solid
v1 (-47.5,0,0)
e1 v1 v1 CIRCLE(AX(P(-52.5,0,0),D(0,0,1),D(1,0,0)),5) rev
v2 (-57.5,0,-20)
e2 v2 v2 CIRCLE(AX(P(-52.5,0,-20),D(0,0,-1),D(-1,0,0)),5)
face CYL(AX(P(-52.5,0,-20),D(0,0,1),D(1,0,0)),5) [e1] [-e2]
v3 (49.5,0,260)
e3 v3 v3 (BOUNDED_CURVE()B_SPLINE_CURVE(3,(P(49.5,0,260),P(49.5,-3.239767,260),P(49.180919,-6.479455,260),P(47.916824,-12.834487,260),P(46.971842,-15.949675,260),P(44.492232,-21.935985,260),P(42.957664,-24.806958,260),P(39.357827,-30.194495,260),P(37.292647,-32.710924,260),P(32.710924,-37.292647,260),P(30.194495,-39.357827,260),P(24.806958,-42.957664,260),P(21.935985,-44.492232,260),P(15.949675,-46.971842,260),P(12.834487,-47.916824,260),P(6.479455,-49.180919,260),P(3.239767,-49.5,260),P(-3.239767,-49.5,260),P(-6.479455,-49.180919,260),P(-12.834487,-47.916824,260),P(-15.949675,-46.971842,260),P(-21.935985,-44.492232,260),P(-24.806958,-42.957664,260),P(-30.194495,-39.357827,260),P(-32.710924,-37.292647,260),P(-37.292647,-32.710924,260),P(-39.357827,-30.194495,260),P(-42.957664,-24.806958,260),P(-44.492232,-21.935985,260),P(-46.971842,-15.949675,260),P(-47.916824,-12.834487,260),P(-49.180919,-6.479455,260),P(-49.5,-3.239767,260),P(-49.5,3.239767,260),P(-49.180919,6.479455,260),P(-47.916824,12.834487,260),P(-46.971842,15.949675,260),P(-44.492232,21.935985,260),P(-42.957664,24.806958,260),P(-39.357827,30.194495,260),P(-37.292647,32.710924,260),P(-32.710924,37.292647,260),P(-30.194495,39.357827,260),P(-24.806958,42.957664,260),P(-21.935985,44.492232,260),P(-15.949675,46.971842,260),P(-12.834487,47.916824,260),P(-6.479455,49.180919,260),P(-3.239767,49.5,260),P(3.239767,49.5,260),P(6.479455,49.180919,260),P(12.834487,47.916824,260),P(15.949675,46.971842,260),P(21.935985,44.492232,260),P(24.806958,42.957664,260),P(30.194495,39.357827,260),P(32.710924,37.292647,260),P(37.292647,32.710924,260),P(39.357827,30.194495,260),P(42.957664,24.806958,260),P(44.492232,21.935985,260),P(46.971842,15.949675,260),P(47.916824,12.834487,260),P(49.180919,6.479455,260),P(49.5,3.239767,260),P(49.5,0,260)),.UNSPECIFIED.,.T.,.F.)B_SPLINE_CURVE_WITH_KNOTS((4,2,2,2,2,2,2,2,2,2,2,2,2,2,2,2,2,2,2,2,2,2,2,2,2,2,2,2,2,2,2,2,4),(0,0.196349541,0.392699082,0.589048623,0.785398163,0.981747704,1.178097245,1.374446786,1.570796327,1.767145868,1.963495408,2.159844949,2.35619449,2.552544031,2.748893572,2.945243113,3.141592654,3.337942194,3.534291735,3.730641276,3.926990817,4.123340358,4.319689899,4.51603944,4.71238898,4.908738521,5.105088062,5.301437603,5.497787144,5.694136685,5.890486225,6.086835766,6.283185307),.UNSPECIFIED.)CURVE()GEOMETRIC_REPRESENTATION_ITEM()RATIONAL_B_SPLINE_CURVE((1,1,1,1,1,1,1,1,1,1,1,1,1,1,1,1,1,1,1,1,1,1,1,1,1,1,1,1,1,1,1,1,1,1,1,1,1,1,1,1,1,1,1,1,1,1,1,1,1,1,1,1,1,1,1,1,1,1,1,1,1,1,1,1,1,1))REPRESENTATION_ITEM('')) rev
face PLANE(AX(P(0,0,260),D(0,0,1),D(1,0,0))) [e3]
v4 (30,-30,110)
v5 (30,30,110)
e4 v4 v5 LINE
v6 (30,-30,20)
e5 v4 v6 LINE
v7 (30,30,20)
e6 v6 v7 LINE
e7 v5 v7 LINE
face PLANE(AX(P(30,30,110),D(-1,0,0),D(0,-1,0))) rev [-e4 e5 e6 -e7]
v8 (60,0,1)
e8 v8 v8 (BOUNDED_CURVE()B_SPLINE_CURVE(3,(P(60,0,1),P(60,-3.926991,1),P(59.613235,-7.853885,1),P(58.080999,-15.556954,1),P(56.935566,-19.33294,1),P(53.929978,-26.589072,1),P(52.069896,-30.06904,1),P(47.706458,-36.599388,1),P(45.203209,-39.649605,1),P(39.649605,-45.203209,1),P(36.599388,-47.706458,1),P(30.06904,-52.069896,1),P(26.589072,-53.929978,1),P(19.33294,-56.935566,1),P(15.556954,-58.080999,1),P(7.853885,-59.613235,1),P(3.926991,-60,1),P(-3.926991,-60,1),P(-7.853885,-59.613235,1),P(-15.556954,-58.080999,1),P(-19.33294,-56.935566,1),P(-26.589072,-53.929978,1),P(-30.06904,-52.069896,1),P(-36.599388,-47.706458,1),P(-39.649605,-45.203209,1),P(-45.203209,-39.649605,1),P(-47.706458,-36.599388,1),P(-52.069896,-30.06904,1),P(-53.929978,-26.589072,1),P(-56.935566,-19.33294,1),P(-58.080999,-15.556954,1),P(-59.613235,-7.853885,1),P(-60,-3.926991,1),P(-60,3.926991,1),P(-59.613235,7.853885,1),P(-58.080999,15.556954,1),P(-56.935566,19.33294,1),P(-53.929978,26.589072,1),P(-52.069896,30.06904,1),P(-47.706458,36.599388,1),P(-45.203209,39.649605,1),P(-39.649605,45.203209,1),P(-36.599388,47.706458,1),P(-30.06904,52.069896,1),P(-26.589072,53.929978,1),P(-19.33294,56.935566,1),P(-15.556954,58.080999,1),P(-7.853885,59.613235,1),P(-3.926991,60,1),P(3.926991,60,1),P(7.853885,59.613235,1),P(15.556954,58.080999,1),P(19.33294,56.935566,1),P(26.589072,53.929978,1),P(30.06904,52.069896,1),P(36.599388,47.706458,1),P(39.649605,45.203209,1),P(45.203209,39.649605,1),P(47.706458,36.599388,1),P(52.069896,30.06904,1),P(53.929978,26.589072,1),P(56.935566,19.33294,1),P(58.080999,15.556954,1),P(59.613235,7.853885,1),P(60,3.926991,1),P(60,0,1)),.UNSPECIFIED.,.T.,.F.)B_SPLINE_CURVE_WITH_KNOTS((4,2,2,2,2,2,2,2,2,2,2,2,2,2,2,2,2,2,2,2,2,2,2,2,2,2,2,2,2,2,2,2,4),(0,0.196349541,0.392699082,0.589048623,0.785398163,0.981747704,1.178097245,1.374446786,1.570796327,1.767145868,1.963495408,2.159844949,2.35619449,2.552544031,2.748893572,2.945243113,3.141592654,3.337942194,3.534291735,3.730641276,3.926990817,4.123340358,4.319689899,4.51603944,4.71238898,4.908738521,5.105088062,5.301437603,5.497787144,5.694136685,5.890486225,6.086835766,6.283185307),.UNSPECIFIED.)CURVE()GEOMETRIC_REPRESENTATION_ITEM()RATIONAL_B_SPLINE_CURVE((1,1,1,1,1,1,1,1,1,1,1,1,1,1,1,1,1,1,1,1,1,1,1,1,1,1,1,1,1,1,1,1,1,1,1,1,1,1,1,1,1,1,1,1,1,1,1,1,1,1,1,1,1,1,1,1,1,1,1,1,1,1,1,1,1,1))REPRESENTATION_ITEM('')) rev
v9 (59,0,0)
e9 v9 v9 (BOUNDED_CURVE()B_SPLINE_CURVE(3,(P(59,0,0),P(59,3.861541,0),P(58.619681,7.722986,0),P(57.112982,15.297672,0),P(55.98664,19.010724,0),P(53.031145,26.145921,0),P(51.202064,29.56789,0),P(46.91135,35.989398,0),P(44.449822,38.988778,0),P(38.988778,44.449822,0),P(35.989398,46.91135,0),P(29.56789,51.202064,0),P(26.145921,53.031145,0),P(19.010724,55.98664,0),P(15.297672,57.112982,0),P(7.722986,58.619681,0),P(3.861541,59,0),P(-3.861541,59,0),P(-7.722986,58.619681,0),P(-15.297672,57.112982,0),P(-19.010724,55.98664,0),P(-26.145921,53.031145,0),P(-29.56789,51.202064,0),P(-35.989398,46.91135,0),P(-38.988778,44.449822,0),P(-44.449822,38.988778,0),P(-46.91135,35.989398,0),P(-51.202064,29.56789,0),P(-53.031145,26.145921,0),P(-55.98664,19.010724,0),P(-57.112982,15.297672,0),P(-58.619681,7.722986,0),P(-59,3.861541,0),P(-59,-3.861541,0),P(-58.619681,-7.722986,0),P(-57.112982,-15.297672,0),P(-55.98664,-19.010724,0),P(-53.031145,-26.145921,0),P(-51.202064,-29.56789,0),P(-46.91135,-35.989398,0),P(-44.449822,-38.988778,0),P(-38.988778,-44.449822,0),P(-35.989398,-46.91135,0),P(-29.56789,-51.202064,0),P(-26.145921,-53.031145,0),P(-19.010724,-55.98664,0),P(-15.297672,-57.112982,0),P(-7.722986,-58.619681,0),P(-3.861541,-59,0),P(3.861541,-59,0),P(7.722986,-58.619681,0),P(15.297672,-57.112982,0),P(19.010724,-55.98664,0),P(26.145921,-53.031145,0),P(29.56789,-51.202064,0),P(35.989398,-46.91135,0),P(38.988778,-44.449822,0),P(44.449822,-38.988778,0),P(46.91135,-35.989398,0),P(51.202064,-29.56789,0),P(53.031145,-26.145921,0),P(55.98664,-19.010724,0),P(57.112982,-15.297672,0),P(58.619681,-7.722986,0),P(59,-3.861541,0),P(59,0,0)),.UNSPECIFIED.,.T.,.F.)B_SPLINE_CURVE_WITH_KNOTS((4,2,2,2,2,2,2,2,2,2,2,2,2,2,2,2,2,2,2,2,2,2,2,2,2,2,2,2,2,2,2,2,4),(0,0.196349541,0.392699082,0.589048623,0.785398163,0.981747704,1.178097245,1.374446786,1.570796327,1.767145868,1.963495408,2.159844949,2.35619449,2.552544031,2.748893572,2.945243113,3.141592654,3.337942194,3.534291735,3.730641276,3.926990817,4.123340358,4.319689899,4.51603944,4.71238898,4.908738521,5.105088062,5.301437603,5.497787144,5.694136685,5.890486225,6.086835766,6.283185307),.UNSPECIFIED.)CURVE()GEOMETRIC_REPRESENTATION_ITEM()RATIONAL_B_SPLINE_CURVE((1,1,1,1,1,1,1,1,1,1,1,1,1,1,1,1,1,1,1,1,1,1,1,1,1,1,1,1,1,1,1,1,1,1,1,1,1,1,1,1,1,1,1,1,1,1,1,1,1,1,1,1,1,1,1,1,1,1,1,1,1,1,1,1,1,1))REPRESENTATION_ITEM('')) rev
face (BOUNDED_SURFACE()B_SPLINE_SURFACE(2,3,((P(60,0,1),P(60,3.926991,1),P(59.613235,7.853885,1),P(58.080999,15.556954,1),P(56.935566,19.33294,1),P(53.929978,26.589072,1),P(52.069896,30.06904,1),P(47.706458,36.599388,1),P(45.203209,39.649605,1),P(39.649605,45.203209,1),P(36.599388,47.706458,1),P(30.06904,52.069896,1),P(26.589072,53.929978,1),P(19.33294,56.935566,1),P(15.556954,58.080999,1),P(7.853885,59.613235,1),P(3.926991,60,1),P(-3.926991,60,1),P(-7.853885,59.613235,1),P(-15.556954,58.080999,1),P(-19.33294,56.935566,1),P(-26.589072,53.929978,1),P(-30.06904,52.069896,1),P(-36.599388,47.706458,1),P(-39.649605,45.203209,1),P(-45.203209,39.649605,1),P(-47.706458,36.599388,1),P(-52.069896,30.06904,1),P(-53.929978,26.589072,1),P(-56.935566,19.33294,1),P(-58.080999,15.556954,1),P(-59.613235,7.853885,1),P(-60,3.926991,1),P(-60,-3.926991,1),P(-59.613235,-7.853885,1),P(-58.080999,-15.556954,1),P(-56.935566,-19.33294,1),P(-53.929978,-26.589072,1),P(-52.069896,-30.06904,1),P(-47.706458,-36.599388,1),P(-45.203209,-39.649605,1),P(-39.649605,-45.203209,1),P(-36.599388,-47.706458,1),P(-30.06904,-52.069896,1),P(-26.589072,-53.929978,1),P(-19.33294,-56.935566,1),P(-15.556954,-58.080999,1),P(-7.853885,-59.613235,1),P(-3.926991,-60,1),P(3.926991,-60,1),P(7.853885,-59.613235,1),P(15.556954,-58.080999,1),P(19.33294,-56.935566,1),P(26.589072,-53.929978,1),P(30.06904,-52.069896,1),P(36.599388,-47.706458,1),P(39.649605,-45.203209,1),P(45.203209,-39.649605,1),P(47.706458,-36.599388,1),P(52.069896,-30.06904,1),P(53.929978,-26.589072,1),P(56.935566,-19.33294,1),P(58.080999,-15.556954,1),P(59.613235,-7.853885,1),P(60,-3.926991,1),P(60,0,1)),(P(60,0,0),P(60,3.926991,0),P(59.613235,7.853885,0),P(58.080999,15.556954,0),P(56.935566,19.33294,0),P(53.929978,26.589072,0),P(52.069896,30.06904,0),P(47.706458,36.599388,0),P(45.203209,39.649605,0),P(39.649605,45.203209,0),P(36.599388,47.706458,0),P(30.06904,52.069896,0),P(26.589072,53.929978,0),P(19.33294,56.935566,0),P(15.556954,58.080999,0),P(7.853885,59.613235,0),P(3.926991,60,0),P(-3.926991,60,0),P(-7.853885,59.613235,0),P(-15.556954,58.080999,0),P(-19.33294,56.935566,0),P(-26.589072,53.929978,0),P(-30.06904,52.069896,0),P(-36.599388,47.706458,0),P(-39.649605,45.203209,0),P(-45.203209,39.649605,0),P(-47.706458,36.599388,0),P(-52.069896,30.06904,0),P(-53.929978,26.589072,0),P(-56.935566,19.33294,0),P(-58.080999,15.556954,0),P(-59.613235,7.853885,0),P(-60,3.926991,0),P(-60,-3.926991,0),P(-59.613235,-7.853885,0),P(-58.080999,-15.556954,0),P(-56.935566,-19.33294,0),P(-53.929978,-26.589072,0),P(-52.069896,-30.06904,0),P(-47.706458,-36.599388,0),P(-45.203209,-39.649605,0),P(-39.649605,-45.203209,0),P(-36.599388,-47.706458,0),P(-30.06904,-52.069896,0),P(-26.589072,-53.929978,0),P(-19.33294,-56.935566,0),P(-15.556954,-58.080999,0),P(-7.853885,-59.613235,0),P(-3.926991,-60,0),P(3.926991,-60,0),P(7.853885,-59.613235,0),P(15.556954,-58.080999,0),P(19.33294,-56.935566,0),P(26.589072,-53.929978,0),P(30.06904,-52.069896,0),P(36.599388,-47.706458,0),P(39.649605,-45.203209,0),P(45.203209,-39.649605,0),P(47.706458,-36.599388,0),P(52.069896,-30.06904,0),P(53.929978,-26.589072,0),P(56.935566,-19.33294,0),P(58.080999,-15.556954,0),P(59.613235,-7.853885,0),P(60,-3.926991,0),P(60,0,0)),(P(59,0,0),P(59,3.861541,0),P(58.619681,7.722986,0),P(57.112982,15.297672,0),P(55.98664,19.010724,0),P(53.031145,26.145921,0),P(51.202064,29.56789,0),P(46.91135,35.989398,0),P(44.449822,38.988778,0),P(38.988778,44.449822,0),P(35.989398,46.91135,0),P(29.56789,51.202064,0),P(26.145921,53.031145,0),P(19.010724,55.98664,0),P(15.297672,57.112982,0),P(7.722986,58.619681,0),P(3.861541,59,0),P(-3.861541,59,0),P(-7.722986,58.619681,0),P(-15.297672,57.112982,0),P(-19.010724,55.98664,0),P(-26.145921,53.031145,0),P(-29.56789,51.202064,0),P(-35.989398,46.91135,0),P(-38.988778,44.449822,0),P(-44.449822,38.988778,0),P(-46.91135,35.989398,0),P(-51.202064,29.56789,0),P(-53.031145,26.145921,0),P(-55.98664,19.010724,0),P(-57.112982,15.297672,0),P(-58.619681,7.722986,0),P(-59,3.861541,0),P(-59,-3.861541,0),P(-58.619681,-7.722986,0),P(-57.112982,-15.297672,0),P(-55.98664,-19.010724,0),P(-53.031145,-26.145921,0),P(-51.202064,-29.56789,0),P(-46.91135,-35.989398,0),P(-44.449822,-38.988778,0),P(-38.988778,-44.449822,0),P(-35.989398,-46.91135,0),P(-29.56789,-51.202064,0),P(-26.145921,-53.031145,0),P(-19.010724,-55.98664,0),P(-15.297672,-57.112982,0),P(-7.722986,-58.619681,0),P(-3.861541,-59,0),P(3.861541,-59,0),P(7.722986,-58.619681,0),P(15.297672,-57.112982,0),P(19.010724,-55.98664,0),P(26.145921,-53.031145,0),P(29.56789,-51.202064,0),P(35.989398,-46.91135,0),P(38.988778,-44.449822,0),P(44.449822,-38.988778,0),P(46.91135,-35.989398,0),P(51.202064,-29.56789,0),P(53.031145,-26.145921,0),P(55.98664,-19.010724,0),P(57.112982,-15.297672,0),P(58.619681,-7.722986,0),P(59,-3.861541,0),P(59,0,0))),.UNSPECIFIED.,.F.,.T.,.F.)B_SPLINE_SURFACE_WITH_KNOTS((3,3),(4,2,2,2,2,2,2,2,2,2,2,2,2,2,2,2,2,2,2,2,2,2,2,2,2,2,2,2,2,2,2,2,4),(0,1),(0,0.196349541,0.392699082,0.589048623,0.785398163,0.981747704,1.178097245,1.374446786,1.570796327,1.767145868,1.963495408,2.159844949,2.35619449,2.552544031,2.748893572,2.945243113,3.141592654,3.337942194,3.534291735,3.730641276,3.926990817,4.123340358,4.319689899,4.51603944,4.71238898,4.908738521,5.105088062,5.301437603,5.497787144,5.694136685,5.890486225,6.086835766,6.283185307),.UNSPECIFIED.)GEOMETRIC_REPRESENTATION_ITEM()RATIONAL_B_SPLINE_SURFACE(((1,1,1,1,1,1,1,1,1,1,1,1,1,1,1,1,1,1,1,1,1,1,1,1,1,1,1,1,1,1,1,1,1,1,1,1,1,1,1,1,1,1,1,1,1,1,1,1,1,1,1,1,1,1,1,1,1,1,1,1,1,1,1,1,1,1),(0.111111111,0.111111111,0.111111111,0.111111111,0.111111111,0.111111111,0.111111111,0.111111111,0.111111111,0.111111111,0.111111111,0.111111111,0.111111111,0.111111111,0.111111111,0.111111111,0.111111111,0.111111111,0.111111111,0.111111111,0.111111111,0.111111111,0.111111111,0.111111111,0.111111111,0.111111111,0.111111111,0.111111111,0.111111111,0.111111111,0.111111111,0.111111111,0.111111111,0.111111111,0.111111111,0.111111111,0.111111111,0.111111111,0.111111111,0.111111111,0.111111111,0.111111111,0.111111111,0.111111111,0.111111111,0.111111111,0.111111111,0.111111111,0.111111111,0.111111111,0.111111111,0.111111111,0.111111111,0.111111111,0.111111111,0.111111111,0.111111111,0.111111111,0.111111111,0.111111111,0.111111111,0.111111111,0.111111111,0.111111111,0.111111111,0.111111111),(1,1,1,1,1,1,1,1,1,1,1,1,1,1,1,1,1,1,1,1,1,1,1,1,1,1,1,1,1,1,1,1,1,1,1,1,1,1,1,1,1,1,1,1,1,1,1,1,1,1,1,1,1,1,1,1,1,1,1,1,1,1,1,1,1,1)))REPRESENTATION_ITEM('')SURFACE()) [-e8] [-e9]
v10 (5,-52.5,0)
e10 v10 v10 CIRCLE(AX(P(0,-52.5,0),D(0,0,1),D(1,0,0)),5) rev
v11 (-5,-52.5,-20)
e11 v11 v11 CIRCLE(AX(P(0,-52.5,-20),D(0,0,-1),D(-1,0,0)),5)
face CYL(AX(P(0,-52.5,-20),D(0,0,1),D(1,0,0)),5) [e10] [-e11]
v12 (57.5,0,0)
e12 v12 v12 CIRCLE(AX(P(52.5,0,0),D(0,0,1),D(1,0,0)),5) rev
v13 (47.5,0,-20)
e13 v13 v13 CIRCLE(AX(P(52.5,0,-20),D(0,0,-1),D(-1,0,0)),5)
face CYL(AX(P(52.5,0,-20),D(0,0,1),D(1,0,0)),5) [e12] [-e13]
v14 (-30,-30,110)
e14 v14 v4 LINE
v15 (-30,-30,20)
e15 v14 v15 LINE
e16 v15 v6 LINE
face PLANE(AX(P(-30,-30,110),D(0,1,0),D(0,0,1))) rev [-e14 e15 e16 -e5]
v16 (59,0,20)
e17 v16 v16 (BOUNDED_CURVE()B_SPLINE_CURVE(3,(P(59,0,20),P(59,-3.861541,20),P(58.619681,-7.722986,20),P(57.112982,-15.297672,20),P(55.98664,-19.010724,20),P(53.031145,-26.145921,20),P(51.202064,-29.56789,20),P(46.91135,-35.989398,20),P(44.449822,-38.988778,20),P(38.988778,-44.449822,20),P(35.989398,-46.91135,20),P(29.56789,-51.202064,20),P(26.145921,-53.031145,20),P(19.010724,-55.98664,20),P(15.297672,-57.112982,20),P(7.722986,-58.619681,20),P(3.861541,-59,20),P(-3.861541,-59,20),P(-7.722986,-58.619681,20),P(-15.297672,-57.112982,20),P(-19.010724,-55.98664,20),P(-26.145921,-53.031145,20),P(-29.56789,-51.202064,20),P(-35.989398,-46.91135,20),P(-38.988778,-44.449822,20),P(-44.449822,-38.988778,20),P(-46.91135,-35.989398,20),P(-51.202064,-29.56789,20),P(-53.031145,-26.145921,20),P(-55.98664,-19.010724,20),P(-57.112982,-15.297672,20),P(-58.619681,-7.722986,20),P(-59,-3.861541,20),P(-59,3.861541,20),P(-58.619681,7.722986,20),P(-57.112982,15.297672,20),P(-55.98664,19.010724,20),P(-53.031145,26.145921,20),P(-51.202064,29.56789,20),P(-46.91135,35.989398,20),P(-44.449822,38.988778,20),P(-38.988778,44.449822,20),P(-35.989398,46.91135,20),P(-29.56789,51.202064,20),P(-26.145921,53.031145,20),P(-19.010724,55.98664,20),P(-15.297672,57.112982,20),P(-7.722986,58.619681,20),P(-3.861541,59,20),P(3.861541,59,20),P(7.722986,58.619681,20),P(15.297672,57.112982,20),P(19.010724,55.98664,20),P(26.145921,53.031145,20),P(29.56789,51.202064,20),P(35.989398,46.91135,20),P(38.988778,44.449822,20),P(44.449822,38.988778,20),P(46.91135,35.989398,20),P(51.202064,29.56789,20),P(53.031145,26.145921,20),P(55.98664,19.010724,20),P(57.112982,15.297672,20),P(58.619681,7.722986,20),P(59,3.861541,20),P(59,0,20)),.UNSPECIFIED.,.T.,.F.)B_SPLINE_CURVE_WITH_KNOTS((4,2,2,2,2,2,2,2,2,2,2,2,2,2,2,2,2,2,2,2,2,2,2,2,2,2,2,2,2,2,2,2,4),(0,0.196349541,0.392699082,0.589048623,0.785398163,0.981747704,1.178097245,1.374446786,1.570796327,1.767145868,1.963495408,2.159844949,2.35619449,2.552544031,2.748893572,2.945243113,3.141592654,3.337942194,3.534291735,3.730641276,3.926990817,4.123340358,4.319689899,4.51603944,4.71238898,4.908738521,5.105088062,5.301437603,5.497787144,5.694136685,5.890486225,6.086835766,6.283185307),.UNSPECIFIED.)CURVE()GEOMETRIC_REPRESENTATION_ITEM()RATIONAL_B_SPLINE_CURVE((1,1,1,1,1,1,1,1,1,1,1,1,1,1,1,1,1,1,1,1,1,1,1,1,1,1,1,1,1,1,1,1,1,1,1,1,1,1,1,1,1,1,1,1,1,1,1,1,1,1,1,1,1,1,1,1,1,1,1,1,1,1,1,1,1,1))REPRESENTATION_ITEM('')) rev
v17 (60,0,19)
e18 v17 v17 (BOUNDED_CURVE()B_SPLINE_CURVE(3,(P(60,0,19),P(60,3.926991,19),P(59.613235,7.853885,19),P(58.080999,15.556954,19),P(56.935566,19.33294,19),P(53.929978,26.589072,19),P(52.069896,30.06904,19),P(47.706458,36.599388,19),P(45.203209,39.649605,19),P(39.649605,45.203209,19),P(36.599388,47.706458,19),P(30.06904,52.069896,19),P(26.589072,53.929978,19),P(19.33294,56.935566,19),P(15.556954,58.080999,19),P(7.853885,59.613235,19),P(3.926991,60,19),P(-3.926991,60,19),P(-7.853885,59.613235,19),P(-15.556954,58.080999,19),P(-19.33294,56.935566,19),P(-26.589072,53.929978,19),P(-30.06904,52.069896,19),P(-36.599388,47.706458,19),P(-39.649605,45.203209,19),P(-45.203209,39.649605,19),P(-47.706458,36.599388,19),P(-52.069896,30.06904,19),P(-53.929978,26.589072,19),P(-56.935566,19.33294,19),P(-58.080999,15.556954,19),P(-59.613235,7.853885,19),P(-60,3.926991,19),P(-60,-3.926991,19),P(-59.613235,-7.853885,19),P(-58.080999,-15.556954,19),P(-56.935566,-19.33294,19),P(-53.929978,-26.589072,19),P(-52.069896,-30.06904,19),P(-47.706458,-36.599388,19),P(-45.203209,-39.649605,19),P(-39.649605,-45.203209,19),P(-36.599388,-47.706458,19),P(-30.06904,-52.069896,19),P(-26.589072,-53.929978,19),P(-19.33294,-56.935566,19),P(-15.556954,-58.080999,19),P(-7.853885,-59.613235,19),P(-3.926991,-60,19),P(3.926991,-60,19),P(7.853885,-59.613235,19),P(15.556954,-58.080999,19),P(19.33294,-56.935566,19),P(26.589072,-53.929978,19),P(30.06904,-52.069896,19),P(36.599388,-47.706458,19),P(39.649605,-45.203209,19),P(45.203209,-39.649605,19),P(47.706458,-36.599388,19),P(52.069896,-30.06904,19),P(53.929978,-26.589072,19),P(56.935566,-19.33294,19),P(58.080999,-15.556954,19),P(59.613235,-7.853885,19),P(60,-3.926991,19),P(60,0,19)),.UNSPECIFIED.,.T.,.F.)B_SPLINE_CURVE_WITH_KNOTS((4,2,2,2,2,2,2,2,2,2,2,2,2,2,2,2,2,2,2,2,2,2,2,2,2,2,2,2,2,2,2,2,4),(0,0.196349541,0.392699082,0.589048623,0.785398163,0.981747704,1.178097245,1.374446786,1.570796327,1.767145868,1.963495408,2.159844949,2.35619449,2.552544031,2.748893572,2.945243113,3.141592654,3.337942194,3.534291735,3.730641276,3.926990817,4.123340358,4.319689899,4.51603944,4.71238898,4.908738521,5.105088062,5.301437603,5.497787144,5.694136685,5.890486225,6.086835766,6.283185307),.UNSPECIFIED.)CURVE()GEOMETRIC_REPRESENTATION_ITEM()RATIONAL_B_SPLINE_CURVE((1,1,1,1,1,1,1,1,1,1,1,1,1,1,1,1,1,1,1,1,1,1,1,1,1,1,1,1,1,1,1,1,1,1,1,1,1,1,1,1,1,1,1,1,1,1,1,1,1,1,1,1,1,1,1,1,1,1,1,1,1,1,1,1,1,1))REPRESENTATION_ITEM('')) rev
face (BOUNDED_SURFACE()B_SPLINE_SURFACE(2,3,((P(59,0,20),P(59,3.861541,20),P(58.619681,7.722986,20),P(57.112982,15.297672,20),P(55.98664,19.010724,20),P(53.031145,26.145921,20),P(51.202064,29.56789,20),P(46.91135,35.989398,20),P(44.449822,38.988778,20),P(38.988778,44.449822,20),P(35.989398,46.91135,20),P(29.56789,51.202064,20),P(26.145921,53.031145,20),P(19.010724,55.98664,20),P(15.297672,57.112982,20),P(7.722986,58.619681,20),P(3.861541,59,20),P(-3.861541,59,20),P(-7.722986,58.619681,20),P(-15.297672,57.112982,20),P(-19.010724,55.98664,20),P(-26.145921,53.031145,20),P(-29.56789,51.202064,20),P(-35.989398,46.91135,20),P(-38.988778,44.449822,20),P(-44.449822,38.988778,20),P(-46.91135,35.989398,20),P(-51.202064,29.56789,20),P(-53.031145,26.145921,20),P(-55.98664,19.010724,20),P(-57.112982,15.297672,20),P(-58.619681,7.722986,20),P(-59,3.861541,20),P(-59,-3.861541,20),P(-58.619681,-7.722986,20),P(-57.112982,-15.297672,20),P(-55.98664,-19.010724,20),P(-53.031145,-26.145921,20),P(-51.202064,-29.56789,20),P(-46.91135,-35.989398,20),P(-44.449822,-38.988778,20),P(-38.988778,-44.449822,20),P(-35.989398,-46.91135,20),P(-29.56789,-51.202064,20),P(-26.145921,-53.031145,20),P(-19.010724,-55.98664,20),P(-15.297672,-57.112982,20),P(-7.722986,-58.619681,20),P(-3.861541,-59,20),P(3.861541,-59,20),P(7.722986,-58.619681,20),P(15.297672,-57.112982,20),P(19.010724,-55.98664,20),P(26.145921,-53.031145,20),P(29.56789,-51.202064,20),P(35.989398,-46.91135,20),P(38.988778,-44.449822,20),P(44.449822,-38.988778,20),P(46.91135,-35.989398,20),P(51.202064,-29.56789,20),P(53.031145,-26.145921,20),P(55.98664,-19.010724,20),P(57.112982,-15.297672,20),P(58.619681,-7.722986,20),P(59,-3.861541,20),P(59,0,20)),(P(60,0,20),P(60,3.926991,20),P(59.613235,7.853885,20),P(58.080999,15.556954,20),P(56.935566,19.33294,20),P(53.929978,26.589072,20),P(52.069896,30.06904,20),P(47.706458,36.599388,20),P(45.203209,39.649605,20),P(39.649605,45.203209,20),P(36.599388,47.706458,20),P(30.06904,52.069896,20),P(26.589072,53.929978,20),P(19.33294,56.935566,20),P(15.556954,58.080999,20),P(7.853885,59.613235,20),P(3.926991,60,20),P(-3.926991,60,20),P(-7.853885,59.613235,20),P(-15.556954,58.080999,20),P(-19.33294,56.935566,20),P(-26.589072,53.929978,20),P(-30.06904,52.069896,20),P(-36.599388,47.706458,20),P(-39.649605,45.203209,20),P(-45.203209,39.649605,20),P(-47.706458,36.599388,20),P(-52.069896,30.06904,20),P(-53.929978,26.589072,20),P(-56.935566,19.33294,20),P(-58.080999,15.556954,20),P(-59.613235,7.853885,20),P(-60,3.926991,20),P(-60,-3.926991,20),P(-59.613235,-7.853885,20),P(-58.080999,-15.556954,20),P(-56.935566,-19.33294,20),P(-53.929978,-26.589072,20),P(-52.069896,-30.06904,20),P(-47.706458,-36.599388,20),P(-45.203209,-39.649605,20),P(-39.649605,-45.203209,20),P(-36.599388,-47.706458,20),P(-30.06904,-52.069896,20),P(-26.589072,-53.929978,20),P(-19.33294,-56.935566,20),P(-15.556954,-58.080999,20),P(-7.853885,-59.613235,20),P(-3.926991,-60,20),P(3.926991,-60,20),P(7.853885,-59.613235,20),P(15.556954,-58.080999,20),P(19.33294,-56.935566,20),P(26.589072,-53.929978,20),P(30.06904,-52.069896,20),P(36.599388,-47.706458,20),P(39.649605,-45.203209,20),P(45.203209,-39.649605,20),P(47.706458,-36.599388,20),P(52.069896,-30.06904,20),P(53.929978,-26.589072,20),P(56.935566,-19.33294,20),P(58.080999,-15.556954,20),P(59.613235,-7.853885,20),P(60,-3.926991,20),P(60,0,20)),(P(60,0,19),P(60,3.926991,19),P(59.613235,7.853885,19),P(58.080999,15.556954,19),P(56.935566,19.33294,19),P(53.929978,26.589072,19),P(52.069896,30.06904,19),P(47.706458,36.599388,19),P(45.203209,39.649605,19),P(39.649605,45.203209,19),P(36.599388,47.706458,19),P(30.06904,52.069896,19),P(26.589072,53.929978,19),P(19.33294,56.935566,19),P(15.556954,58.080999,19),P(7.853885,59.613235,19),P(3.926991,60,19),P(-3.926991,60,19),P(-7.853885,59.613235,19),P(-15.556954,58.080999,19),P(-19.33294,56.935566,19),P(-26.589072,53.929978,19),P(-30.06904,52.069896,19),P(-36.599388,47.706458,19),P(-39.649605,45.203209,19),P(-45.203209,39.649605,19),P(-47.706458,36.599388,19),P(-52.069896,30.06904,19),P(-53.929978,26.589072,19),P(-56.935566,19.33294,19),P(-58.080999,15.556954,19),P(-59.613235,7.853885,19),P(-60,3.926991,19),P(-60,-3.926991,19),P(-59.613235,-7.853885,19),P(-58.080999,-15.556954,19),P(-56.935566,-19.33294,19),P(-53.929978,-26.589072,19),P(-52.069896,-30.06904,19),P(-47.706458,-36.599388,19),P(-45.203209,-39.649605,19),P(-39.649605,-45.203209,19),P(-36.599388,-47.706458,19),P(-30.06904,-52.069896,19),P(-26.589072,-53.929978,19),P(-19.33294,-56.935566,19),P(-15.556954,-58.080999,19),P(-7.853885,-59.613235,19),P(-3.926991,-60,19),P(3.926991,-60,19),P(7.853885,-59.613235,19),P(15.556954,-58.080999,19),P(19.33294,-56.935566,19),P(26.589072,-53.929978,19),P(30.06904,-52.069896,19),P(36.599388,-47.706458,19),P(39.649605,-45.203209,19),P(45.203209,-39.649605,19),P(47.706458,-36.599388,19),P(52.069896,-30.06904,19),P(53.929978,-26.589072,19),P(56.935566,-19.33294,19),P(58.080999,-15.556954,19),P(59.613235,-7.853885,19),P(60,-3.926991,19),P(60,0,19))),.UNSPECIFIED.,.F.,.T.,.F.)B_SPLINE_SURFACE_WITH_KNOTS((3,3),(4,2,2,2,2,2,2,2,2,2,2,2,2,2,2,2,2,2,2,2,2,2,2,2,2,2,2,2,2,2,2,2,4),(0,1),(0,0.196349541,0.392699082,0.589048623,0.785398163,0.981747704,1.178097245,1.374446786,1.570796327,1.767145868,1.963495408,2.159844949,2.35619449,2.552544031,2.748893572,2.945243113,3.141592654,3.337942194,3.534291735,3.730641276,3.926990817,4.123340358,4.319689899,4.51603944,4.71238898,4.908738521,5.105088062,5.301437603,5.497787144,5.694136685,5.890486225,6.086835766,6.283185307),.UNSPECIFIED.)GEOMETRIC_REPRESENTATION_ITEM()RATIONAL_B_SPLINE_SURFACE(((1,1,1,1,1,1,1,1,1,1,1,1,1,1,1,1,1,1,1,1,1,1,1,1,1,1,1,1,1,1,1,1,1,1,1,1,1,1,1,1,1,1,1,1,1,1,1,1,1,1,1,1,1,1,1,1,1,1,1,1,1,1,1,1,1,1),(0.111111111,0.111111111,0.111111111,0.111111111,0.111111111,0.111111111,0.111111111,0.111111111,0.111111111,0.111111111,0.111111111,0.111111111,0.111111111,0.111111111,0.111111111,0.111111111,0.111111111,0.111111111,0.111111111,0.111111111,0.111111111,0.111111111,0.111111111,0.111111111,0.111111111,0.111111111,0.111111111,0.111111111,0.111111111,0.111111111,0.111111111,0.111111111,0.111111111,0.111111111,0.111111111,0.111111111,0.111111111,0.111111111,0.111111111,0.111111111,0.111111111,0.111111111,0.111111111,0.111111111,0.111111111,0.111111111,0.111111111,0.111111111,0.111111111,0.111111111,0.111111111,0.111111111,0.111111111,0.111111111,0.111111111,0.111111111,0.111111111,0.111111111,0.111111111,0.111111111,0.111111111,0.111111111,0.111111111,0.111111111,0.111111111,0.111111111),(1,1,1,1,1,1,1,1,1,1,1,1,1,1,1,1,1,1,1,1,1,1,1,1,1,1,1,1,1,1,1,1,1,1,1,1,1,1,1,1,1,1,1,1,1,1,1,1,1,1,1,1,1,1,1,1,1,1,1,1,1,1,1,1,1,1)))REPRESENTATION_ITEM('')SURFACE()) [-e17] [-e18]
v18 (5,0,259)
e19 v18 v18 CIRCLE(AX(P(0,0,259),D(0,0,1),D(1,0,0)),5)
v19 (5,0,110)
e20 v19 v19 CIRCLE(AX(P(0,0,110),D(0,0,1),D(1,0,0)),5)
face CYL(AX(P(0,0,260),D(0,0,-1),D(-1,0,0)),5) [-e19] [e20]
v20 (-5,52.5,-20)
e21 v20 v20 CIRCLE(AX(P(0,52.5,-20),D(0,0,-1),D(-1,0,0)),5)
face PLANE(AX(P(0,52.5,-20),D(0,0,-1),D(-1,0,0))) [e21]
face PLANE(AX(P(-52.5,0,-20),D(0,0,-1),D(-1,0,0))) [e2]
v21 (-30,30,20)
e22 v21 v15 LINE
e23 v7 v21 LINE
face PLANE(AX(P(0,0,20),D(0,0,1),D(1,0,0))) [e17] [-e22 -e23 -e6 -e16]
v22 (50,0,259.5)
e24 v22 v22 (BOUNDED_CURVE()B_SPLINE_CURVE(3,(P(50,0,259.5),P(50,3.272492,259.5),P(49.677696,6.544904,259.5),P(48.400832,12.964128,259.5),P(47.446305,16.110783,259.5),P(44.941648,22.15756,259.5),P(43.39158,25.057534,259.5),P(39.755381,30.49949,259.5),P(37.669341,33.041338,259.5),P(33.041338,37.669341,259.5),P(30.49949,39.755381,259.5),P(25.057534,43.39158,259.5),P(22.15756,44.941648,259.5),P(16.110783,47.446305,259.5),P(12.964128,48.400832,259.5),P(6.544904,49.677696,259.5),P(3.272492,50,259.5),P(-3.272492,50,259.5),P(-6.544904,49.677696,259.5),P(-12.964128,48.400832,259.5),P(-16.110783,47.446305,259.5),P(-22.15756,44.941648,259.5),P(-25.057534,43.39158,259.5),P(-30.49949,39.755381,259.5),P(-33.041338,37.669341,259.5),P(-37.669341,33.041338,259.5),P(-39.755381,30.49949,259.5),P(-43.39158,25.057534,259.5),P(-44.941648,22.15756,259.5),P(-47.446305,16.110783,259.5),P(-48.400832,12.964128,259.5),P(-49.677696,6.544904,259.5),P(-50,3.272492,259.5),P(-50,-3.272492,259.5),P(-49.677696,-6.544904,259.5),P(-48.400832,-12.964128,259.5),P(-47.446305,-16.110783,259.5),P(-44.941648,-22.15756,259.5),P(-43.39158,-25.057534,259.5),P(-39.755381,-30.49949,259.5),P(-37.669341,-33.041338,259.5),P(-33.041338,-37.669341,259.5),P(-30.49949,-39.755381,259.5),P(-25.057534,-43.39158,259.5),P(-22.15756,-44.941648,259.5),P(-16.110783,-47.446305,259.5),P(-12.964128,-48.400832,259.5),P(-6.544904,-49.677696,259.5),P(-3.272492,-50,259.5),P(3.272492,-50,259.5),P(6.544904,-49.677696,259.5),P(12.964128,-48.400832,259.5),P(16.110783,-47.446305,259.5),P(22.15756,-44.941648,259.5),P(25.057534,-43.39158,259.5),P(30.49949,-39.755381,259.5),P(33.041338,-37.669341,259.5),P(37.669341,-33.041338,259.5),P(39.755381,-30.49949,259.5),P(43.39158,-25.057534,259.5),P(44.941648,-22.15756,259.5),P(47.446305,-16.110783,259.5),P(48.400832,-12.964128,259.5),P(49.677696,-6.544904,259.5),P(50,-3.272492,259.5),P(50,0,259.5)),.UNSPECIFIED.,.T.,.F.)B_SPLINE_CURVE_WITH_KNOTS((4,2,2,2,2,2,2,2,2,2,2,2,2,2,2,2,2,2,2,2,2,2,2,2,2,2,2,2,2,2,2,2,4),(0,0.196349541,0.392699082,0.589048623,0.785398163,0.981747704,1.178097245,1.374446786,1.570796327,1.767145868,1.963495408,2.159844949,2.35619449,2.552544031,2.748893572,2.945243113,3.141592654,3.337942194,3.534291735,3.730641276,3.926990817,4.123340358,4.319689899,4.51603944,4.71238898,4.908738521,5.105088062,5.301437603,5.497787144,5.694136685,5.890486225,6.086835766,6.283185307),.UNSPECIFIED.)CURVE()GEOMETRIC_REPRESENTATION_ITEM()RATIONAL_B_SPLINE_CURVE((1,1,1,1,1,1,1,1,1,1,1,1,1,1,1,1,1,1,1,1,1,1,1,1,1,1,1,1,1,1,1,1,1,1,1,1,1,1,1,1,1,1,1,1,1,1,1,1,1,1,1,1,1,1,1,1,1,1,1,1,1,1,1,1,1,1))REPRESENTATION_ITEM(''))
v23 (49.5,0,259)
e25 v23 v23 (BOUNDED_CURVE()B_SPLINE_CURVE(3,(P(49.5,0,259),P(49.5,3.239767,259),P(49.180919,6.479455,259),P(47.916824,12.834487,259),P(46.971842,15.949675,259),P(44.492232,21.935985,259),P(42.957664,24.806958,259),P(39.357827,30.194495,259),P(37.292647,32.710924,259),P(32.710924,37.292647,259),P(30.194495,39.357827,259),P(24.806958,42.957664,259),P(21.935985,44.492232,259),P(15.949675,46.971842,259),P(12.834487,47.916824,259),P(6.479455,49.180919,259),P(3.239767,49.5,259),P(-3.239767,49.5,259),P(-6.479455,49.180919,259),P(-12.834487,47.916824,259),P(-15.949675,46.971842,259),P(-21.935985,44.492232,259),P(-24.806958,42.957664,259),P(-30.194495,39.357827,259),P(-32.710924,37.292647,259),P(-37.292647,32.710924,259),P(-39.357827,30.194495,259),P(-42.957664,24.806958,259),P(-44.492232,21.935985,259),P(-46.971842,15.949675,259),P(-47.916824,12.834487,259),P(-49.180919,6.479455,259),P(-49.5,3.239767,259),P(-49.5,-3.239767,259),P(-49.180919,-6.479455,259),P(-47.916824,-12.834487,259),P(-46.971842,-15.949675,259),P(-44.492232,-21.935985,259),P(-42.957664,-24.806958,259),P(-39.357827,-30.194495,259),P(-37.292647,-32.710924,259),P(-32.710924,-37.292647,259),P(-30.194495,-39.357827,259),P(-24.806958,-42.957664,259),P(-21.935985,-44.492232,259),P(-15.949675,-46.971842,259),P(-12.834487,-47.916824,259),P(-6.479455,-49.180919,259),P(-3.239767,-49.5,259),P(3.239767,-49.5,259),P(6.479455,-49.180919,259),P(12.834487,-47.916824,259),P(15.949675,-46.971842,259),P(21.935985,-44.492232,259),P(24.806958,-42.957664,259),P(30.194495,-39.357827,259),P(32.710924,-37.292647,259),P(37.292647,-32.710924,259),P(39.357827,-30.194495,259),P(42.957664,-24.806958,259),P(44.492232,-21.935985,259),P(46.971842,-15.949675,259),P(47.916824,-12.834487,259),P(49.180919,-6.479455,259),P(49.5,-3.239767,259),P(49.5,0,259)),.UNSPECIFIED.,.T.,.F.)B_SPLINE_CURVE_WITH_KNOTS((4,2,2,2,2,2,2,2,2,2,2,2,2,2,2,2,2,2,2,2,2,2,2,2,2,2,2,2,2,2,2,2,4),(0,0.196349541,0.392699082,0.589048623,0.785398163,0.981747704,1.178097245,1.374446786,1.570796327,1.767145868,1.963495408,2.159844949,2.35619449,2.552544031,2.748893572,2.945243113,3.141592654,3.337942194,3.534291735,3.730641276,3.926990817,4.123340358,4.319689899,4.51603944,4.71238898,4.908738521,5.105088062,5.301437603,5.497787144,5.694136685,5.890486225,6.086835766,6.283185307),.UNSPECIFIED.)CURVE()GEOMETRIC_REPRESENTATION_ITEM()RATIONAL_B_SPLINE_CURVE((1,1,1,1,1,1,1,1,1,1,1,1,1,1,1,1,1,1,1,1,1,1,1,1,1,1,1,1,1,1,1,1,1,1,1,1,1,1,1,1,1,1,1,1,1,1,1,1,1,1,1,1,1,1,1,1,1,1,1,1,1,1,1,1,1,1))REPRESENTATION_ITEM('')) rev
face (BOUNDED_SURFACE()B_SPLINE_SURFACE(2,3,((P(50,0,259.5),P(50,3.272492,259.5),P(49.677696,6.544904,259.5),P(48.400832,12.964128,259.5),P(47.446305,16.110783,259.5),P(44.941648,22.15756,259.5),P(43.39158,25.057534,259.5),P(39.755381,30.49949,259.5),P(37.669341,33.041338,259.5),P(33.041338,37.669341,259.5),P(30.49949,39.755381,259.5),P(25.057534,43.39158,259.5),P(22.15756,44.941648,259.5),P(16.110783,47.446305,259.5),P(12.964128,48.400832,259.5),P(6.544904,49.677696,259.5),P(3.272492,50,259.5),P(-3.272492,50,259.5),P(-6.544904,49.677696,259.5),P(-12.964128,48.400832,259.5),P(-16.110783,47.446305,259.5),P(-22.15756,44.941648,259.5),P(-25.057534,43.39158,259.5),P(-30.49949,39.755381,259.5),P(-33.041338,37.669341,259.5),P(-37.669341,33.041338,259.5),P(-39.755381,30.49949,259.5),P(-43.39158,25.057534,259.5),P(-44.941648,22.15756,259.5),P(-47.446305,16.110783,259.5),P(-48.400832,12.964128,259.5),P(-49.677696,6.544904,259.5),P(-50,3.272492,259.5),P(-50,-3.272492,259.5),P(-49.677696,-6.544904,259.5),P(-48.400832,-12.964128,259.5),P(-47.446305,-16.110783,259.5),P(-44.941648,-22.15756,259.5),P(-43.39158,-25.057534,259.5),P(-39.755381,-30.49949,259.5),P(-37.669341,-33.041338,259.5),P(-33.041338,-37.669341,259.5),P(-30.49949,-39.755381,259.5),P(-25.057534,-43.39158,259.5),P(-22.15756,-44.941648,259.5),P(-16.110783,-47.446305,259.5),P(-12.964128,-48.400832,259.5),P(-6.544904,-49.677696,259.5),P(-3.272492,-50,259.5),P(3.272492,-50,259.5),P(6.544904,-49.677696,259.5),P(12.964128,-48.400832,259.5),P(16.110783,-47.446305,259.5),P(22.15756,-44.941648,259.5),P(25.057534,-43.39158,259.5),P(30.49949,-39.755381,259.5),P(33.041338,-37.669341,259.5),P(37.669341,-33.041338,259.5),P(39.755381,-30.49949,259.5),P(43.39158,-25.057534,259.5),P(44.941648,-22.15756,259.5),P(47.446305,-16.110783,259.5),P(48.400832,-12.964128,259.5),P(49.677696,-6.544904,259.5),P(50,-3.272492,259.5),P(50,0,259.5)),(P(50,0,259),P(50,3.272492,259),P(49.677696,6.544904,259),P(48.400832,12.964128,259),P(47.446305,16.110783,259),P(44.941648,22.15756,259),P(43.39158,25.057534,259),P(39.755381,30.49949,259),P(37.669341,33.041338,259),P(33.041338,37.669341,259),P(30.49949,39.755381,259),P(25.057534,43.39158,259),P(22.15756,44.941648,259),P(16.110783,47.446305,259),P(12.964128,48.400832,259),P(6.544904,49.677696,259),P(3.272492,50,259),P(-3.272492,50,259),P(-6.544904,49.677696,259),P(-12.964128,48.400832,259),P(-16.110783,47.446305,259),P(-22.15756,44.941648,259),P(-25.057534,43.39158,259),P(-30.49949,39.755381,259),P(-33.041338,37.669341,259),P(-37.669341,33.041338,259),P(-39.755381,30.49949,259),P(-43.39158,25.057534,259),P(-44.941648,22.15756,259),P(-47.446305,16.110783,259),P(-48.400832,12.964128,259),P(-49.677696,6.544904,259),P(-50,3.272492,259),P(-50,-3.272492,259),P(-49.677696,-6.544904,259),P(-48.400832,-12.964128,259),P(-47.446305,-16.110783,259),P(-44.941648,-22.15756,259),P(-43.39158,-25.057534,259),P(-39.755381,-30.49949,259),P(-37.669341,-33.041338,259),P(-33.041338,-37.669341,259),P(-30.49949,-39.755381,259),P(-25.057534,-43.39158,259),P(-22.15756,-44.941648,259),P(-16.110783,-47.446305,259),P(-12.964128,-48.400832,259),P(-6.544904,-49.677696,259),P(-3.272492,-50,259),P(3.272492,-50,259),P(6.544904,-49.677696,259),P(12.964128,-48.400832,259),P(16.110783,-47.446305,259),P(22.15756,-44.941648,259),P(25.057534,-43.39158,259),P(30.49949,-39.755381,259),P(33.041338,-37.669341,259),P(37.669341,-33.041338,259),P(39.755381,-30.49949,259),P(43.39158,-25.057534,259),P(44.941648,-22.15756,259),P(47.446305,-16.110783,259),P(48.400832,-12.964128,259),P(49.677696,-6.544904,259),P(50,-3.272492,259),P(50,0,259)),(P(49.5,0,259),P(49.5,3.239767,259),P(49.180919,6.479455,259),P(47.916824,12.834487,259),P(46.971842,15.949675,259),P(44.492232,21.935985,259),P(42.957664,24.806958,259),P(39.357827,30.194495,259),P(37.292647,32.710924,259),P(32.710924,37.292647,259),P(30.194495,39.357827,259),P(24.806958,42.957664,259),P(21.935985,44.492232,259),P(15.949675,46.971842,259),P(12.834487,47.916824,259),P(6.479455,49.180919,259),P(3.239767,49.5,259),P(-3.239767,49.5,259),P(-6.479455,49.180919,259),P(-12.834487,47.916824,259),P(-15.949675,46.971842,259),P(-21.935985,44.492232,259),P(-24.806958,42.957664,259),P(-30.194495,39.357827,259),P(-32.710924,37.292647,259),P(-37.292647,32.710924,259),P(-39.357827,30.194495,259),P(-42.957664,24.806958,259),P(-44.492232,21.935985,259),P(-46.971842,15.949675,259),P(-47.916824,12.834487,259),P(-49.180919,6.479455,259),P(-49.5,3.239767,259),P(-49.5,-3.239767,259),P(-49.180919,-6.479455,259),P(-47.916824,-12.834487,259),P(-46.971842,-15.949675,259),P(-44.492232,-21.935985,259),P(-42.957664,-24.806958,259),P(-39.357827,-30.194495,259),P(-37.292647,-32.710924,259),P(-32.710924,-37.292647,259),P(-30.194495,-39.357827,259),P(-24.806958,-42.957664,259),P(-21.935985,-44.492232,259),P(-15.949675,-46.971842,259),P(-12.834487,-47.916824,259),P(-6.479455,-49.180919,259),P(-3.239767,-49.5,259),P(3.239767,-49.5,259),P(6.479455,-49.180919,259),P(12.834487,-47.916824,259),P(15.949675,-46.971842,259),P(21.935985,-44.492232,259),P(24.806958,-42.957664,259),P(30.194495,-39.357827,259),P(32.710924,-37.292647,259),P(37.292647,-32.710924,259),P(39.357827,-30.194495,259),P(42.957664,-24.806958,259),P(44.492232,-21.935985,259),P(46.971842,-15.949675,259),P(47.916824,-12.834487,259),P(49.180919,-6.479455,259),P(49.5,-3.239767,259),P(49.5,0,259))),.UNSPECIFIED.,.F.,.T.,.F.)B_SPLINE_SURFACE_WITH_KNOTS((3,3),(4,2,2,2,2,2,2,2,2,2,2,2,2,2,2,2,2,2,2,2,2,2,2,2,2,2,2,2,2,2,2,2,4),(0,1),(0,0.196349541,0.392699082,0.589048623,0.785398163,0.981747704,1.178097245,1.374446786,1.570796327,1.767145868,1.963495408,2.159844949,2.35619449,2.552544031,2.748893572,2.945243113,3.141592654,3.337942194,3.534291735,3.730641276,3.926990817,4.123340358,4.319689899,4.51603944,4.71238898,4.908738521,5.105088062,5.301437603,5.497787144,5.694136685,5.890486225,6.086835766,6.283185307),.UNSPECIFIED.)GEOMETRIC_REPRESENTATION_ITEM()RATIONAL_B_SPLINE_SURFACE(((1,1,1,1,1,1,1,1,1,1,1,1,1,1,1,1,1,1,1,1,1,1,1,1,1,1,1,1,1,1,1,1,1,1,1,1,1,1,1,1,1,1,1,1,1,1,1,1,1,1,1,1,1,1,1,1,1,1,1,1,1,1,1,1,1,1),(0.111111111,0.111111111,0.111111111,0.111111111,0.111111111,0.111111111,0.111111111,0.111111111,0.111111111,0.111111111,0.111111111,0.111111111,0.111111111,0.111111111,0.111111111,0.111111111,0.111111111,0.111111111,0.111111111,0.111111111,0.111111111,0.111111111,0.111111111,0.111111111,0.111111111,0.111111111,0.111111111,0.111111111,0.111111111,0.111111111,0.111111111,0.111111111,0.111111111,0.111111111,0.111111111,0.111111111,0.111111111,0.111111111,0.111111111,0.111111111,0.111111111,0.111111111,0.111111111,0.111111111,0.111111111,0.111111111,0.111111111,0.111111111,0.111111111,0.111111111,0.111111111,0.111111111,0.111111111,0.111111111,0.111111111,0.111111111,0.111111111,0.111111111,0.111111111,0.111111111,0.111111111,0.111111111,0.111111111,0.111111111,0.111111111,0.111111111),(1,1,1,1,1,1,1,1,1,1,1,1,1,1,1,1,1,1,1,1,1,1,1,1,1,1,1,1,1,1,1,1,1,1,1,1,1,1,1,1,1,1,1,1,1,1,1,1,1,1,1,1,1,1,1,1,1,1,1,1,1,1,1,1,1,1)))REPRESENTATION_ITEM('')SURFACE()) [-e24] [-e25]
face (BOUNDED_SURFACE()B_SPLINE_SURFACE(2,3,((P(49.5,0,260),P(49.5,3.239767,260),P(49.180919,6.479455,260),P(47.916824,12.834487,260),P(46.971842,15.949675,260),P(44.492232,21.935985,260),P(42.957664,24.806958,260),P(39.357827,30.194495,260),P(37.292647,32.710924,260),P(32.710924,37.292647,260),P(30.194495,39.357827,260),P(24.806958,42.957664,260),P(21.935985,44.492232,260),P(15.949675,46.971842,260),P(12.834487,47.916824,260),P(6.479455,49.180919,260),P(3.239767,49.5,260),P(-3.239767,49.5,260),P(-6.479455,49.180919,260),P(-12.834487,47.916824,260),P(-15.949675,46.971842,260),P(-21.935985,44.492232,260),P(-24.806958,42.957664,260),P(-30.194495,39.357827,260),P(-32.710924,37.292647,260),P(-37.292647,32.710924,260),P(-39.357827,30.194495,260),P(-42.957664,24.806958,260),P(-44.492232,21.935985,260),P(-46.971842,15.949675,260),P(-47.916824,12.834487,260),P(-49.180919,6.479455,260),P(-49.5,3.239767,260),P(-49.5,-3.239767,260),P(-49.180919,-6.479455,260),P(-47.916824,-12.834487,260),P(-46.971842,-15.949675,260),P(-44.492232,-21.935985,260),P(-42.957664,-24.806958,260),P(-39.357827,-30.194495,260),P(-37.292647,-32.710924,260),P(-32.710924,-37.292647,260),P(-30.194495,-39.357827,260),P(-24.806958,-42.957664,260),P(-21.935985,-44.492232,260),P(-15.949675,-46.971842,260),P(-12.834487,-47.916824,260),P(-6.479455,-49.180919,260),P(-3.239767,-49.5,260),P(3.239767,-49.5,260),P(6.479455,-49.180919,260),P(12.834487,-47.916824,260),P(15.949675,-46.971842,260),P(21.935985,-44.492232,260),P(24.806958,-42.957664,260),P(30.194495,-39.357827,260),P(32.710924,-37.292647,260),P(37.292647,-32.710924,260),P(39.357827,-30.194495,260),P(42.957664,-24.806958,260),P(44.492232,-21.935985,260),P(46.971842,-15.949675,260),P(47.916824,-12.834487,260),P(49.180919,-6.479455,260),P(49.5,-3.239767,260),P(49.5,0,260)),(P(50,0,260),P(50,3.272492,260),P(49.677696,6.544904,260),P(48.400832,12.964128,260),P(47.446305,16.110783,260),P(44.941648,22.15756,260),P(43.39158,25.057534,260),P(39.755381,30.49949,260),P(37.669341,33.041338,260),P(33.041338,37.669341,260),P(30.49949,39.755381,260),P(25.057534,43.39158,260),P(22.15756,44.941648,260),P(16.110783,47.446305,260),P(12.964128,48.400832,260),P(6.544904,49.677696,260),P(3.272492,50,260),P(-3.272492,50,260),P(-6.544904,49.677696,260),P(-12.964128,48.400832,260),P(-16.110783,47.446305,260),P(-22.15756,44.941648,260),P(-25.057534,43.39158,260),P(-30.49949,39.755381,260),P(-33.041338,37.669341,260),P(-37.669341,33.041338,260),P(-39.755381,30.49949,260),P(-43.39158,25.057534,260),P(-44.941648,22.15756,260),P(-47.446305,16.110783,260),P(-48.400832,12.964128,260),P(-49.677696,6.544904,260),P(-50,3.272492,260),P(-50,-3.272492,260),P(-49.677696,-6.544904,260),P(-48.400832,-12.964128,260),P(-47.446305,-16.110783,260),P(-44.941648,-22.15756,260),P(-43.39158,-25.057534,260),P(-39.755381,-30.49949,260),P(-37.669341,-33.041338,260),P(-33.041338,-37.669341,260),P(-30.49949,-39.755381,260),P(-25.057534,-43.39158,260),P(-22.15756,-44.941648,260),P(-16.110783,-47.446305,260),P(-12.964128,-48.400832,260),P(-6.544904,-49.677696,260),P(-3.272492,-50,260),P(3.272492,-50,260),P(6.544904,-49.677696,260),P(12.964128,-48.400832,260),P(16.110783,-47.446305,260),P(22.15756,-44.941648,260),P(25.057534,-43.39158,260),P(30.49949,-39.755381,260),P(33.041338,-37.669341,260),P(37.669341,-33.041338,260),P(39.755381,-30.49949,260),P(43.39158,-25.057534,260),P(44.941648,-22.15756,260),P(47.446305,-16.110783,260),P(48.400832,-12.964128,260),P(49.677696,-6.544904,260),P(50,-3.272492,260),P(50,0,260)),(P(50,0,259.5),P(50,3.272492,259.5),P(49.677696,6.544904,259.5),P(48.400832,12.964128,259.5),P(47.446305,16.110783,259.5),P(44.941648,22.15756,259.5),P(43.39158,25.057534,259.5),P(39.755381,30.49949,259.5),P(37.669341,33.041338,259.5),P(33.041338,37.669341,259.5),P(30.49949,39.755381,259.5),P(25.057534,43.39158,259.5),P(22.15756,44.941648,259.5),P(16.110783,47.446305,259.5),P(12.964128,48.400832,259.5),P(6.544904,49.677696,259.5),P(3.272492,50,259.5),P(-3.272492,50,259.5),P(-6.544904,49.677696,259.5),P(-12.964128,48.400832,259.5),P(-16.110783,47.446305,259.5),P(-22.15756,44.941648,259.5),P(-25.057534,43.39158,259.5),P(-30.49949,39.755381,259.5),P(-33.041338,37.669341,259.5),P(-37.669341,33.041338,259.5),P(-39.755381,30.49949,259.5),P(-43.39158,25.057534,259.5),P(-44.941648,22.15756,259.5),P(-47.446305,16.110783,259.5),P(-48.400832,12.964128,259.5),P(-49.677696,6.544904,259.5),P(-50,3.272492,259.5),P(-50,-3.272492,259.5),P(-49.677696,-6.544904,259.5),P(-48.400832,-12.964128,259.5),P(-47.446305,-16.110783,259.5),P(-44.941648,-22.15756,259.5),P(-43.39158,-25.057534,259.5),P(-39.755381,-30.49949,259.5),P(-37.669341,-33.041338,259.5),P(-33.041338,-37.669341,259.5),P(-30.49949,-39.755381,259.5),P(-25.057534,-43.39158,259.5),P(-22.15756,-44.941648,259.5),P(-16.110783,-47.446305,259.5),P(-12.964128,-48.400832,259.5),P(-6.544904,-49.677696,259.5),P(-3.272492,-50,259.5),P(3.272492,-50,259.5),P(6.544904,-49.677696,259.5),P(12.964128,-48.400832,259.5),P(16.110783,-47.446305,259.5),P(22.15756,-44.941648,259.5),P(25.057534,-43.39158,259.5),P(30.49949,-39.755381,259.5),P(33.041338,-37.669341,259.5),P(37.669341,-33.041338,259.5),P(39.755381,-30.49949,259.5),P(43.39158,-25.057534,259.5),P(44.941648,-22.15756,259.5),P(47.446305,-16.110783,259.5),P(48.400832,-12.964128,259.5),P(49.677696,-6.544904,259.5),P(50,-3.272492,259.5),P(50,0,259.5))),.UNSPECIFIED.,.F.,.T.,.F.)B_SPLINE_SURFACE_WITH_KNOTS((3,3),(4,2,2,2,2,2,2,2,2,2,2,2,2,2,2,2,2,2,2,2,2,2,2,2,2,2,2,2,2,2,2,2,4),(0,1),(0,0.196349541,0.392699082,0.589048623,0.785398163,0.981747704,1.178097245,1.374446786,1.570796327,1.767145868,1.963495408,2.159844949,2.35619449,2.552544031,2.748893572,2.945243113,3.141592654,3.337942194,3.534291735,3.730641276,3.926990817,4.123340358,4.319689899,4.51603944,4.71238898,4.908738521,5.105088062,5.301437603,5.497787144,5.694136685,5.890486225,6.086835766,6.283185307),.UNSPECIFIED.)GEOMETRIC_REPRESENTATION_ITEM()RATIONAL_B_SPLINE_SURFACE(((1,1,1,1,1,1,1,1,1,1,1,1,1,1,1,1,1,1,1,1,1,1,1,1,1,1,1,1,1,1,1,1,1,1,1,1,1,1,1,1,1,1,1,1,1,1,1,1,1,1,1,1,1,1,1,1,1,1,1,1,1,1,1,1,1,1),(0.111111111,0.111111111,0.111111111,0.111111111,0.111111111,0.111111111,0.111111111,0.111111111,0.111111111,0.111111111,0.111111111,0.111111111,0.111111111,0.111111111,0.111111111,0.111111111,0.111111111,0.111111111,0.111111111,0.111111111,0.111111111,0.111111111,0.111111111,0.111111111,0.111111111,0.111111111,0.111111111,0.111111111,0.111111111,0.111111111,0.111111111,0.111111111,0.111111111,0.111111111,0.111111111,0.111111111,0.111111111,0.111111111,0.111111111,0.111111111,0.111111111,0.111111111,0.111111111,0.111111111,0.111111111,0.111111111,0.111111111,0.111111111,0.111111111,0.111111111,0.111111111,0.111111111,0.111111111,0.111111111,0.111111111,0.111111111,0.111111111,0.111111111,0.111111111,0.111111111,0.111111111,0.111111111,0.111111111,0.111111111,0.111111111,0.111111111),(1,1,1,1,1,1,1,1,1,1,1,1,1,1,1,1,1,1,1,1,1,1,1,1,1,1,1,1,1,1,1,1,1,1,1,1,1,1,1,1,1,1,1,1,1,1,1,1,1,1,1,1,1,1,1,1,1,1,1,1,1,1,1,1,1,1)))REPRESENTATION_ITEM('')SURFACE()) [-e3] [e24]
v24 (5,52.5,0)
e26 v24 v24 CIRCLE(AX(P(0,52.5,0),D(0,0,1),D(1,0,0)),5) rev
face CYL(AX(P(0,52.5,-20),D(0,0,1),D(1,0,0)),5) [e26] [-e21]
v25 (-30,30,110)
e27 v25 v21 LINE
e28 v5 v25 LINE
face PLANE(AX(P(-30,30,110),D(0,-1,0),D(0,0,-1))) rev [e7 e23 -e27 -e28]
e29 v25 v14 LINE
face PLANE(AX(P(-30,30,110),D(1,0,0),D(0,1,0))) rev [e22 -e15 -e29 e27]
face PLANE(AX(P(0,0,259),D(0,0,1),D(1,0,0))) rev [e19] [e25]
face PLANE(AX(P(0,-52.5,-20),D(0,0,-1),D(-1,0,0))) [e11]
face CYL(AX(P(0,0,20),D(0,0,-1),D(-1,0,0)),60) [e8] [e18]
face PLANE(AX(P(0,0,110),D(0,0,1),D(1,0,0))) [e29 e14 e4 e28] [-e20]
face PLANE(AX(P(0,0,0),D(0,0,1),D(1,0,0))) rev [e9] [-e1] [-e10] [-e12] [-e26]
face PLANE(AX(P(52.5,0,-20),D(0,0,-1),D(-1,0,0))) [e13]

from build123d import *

# Parameters (mm, degrees)
SKETCH1_R           = 60
BOSS_EXTRUDE1_DEPTH = 20
FILLET1_SIZE        = 1
FILLET2_SIZE        = 1
SKETCH2_R           = 5
BOSS_EXTRUDE2_DEPTH = 20
SKETCH3_W           = 60
SKETCH3_H           = 60
BOSS_EXTRUDE3_DEPTH = 90
SKETCH4_R           = 5
BOSS_EXTRUDE4_DEPTH = 150
SKETCH5_R           = 50
BOSS_EXTRUDE5_DEPTH = 1
FILLET3_SIZE        = 0.5


with BuildPart() as part:
    # Sketch1 → Boss-Extrude1 (new body)
    with BuildSketch(Plane.XY):
        Circle(SKETCH1_R)
    extrude(amount=BOSS_EXTRUDE1_DEPTH)

    # Fillet1
    # a fillet whose section is not a circle: 1 mm, written as the material it takes off along each edge
    with BuildSketch(Plane(origin=(0, 0, 0), x_dir=(1, 0, 0), z_dir=(0, -1, 0))) as fillet1_piece_1:
        with BuildLine():
            Bezier((60, FILLET1_SIZE), (60, 0), (60 - FILLET1_SIZE, 0), weights=[1, 0.111111111, 1])
            Line((60 - FILLET1_SIZE, 0), (60, 0))
            Line((60, 0), (60, FILLET1_SIZE))
        make_face()
    revolve(axis=Axis((0, 0, 0), (0, 0, 1)), mode=Mode.SUBTRACT)

    # Fillet2
    # a fillet whose section is not a circle: 1 mm, written as the material it takes off along each edge
    with BuildSketch(Plane(origin=(0, 0, 20), x_dir=(1, 0, 0), z_dir=(0, -1, 0))) as fillet2_piece_1:
        with BuildLine():
            Bezier((60, -FILLET2_SIZE), (60, 0), (60 - FILLET2_SIZE, 0), weights=[1, 0.111111111, 1])
            Line((60 - FILLET2_SIZE, 0), (60, 0))
            Line((60, 0), (60, -FILLET2_SIZE))
        make_face()
    revolve(axis=Axis((0, 0, 20), (0, 0, 1)), mode=Mode.SUBTRACT)

    # Sketch2 → Boss-Extrude2 (add)
    with BuildSketch(Plane(origin=(0, 0, 0), x_dir=(-1, 0, 0), z_dir=(0, 0, -1))):
        with Locations(Location((0, 52.5, 0), (0, 0, 180))):
            Circle(SKETCH2_R)
        with Locations(Location((52.5, 0, 0), (0, 0, 180))):
            Circle(SKETCH2_R)
        with Locations(Location((0, -52.5, 0), (0, 0, 180))):
            Circle(SKETCH2_R)
        with Locations(Location((-52.5, 0, 0), (0, 0, 180))):
            Circle(SKETCH2_R)
    extrude(amount=BOSS_EXTRUDE2_DEPTH)

    # Sketch3 → Boss-Extrude3 (add)
    with BuildSketch(Plane.XY.offset(20)):
        Rectangle(SKETCH3_W, SKETCH3_H)
    extrude(amount=BOSS_EXTRUDE3_DEPTH)

    # Sketch4 → Boss-Extrude4 (add)
    with BuildSketch(Plane.XY.offset(110)):
        Circle(SKETCH4_R)
    extrude(amount=BOSS_EXTRUDE4_DEPTH)

    # Sketch5 → Boss-Extrude5 (add)
    with BuildSketch(Plane.XY.offset(260)):
        Circle(SKETCH5_R)
    extrude(amount=-BOSS_EXTRUDE5_DEPTH)

    # Fillet3
    # a fillet whose section is not a circle: 0.5 mm, written as the material it takes off along each edge
    with BuildSketch(Plane(origin=(0, 0, 259), x_dir=(1, 0, 0), z_dir=(0, -1, 0))) as fillet3_piece_1:
        with BuildLine():
            Bezier((50 - FILLET3_SIZE, 0), (50, 0), (50, FILLET3_SIZE), weights=[1, 0.111111111, 1])
            Line((50, FILLET3_SIZE), (50, 0))
            Line((50, 0), (50 - FILLET3_SIZE, 0))
        make_face()
    revolve(axis=Axis((0, 0, 259), (0, 0, 1)), mode=Mode.SUBTRACT)
    with BuildSketch(Plane(origin=(0, 0, 260), x_dir=(1, 0, 0), z_dir=(0, -1, 0))) as fillet3_piece_2:
        with BuildLine():
            Bezier((50, -FILLET3_SIZE), (50, 0), (50 - FILLET3_SIZE, 0), weights=[1, 0.111111111, 1])
            Line((50 - FILLET3_SIZE, 0), (50, 0))
            Line((50, 0), (50, -FILLET3_SIZE))
        make_face()
    revolve(axis=Axis((0, 0, 260), (0, 0, 1)), mode=Mode.SUBTRACT)


solid = part.part
